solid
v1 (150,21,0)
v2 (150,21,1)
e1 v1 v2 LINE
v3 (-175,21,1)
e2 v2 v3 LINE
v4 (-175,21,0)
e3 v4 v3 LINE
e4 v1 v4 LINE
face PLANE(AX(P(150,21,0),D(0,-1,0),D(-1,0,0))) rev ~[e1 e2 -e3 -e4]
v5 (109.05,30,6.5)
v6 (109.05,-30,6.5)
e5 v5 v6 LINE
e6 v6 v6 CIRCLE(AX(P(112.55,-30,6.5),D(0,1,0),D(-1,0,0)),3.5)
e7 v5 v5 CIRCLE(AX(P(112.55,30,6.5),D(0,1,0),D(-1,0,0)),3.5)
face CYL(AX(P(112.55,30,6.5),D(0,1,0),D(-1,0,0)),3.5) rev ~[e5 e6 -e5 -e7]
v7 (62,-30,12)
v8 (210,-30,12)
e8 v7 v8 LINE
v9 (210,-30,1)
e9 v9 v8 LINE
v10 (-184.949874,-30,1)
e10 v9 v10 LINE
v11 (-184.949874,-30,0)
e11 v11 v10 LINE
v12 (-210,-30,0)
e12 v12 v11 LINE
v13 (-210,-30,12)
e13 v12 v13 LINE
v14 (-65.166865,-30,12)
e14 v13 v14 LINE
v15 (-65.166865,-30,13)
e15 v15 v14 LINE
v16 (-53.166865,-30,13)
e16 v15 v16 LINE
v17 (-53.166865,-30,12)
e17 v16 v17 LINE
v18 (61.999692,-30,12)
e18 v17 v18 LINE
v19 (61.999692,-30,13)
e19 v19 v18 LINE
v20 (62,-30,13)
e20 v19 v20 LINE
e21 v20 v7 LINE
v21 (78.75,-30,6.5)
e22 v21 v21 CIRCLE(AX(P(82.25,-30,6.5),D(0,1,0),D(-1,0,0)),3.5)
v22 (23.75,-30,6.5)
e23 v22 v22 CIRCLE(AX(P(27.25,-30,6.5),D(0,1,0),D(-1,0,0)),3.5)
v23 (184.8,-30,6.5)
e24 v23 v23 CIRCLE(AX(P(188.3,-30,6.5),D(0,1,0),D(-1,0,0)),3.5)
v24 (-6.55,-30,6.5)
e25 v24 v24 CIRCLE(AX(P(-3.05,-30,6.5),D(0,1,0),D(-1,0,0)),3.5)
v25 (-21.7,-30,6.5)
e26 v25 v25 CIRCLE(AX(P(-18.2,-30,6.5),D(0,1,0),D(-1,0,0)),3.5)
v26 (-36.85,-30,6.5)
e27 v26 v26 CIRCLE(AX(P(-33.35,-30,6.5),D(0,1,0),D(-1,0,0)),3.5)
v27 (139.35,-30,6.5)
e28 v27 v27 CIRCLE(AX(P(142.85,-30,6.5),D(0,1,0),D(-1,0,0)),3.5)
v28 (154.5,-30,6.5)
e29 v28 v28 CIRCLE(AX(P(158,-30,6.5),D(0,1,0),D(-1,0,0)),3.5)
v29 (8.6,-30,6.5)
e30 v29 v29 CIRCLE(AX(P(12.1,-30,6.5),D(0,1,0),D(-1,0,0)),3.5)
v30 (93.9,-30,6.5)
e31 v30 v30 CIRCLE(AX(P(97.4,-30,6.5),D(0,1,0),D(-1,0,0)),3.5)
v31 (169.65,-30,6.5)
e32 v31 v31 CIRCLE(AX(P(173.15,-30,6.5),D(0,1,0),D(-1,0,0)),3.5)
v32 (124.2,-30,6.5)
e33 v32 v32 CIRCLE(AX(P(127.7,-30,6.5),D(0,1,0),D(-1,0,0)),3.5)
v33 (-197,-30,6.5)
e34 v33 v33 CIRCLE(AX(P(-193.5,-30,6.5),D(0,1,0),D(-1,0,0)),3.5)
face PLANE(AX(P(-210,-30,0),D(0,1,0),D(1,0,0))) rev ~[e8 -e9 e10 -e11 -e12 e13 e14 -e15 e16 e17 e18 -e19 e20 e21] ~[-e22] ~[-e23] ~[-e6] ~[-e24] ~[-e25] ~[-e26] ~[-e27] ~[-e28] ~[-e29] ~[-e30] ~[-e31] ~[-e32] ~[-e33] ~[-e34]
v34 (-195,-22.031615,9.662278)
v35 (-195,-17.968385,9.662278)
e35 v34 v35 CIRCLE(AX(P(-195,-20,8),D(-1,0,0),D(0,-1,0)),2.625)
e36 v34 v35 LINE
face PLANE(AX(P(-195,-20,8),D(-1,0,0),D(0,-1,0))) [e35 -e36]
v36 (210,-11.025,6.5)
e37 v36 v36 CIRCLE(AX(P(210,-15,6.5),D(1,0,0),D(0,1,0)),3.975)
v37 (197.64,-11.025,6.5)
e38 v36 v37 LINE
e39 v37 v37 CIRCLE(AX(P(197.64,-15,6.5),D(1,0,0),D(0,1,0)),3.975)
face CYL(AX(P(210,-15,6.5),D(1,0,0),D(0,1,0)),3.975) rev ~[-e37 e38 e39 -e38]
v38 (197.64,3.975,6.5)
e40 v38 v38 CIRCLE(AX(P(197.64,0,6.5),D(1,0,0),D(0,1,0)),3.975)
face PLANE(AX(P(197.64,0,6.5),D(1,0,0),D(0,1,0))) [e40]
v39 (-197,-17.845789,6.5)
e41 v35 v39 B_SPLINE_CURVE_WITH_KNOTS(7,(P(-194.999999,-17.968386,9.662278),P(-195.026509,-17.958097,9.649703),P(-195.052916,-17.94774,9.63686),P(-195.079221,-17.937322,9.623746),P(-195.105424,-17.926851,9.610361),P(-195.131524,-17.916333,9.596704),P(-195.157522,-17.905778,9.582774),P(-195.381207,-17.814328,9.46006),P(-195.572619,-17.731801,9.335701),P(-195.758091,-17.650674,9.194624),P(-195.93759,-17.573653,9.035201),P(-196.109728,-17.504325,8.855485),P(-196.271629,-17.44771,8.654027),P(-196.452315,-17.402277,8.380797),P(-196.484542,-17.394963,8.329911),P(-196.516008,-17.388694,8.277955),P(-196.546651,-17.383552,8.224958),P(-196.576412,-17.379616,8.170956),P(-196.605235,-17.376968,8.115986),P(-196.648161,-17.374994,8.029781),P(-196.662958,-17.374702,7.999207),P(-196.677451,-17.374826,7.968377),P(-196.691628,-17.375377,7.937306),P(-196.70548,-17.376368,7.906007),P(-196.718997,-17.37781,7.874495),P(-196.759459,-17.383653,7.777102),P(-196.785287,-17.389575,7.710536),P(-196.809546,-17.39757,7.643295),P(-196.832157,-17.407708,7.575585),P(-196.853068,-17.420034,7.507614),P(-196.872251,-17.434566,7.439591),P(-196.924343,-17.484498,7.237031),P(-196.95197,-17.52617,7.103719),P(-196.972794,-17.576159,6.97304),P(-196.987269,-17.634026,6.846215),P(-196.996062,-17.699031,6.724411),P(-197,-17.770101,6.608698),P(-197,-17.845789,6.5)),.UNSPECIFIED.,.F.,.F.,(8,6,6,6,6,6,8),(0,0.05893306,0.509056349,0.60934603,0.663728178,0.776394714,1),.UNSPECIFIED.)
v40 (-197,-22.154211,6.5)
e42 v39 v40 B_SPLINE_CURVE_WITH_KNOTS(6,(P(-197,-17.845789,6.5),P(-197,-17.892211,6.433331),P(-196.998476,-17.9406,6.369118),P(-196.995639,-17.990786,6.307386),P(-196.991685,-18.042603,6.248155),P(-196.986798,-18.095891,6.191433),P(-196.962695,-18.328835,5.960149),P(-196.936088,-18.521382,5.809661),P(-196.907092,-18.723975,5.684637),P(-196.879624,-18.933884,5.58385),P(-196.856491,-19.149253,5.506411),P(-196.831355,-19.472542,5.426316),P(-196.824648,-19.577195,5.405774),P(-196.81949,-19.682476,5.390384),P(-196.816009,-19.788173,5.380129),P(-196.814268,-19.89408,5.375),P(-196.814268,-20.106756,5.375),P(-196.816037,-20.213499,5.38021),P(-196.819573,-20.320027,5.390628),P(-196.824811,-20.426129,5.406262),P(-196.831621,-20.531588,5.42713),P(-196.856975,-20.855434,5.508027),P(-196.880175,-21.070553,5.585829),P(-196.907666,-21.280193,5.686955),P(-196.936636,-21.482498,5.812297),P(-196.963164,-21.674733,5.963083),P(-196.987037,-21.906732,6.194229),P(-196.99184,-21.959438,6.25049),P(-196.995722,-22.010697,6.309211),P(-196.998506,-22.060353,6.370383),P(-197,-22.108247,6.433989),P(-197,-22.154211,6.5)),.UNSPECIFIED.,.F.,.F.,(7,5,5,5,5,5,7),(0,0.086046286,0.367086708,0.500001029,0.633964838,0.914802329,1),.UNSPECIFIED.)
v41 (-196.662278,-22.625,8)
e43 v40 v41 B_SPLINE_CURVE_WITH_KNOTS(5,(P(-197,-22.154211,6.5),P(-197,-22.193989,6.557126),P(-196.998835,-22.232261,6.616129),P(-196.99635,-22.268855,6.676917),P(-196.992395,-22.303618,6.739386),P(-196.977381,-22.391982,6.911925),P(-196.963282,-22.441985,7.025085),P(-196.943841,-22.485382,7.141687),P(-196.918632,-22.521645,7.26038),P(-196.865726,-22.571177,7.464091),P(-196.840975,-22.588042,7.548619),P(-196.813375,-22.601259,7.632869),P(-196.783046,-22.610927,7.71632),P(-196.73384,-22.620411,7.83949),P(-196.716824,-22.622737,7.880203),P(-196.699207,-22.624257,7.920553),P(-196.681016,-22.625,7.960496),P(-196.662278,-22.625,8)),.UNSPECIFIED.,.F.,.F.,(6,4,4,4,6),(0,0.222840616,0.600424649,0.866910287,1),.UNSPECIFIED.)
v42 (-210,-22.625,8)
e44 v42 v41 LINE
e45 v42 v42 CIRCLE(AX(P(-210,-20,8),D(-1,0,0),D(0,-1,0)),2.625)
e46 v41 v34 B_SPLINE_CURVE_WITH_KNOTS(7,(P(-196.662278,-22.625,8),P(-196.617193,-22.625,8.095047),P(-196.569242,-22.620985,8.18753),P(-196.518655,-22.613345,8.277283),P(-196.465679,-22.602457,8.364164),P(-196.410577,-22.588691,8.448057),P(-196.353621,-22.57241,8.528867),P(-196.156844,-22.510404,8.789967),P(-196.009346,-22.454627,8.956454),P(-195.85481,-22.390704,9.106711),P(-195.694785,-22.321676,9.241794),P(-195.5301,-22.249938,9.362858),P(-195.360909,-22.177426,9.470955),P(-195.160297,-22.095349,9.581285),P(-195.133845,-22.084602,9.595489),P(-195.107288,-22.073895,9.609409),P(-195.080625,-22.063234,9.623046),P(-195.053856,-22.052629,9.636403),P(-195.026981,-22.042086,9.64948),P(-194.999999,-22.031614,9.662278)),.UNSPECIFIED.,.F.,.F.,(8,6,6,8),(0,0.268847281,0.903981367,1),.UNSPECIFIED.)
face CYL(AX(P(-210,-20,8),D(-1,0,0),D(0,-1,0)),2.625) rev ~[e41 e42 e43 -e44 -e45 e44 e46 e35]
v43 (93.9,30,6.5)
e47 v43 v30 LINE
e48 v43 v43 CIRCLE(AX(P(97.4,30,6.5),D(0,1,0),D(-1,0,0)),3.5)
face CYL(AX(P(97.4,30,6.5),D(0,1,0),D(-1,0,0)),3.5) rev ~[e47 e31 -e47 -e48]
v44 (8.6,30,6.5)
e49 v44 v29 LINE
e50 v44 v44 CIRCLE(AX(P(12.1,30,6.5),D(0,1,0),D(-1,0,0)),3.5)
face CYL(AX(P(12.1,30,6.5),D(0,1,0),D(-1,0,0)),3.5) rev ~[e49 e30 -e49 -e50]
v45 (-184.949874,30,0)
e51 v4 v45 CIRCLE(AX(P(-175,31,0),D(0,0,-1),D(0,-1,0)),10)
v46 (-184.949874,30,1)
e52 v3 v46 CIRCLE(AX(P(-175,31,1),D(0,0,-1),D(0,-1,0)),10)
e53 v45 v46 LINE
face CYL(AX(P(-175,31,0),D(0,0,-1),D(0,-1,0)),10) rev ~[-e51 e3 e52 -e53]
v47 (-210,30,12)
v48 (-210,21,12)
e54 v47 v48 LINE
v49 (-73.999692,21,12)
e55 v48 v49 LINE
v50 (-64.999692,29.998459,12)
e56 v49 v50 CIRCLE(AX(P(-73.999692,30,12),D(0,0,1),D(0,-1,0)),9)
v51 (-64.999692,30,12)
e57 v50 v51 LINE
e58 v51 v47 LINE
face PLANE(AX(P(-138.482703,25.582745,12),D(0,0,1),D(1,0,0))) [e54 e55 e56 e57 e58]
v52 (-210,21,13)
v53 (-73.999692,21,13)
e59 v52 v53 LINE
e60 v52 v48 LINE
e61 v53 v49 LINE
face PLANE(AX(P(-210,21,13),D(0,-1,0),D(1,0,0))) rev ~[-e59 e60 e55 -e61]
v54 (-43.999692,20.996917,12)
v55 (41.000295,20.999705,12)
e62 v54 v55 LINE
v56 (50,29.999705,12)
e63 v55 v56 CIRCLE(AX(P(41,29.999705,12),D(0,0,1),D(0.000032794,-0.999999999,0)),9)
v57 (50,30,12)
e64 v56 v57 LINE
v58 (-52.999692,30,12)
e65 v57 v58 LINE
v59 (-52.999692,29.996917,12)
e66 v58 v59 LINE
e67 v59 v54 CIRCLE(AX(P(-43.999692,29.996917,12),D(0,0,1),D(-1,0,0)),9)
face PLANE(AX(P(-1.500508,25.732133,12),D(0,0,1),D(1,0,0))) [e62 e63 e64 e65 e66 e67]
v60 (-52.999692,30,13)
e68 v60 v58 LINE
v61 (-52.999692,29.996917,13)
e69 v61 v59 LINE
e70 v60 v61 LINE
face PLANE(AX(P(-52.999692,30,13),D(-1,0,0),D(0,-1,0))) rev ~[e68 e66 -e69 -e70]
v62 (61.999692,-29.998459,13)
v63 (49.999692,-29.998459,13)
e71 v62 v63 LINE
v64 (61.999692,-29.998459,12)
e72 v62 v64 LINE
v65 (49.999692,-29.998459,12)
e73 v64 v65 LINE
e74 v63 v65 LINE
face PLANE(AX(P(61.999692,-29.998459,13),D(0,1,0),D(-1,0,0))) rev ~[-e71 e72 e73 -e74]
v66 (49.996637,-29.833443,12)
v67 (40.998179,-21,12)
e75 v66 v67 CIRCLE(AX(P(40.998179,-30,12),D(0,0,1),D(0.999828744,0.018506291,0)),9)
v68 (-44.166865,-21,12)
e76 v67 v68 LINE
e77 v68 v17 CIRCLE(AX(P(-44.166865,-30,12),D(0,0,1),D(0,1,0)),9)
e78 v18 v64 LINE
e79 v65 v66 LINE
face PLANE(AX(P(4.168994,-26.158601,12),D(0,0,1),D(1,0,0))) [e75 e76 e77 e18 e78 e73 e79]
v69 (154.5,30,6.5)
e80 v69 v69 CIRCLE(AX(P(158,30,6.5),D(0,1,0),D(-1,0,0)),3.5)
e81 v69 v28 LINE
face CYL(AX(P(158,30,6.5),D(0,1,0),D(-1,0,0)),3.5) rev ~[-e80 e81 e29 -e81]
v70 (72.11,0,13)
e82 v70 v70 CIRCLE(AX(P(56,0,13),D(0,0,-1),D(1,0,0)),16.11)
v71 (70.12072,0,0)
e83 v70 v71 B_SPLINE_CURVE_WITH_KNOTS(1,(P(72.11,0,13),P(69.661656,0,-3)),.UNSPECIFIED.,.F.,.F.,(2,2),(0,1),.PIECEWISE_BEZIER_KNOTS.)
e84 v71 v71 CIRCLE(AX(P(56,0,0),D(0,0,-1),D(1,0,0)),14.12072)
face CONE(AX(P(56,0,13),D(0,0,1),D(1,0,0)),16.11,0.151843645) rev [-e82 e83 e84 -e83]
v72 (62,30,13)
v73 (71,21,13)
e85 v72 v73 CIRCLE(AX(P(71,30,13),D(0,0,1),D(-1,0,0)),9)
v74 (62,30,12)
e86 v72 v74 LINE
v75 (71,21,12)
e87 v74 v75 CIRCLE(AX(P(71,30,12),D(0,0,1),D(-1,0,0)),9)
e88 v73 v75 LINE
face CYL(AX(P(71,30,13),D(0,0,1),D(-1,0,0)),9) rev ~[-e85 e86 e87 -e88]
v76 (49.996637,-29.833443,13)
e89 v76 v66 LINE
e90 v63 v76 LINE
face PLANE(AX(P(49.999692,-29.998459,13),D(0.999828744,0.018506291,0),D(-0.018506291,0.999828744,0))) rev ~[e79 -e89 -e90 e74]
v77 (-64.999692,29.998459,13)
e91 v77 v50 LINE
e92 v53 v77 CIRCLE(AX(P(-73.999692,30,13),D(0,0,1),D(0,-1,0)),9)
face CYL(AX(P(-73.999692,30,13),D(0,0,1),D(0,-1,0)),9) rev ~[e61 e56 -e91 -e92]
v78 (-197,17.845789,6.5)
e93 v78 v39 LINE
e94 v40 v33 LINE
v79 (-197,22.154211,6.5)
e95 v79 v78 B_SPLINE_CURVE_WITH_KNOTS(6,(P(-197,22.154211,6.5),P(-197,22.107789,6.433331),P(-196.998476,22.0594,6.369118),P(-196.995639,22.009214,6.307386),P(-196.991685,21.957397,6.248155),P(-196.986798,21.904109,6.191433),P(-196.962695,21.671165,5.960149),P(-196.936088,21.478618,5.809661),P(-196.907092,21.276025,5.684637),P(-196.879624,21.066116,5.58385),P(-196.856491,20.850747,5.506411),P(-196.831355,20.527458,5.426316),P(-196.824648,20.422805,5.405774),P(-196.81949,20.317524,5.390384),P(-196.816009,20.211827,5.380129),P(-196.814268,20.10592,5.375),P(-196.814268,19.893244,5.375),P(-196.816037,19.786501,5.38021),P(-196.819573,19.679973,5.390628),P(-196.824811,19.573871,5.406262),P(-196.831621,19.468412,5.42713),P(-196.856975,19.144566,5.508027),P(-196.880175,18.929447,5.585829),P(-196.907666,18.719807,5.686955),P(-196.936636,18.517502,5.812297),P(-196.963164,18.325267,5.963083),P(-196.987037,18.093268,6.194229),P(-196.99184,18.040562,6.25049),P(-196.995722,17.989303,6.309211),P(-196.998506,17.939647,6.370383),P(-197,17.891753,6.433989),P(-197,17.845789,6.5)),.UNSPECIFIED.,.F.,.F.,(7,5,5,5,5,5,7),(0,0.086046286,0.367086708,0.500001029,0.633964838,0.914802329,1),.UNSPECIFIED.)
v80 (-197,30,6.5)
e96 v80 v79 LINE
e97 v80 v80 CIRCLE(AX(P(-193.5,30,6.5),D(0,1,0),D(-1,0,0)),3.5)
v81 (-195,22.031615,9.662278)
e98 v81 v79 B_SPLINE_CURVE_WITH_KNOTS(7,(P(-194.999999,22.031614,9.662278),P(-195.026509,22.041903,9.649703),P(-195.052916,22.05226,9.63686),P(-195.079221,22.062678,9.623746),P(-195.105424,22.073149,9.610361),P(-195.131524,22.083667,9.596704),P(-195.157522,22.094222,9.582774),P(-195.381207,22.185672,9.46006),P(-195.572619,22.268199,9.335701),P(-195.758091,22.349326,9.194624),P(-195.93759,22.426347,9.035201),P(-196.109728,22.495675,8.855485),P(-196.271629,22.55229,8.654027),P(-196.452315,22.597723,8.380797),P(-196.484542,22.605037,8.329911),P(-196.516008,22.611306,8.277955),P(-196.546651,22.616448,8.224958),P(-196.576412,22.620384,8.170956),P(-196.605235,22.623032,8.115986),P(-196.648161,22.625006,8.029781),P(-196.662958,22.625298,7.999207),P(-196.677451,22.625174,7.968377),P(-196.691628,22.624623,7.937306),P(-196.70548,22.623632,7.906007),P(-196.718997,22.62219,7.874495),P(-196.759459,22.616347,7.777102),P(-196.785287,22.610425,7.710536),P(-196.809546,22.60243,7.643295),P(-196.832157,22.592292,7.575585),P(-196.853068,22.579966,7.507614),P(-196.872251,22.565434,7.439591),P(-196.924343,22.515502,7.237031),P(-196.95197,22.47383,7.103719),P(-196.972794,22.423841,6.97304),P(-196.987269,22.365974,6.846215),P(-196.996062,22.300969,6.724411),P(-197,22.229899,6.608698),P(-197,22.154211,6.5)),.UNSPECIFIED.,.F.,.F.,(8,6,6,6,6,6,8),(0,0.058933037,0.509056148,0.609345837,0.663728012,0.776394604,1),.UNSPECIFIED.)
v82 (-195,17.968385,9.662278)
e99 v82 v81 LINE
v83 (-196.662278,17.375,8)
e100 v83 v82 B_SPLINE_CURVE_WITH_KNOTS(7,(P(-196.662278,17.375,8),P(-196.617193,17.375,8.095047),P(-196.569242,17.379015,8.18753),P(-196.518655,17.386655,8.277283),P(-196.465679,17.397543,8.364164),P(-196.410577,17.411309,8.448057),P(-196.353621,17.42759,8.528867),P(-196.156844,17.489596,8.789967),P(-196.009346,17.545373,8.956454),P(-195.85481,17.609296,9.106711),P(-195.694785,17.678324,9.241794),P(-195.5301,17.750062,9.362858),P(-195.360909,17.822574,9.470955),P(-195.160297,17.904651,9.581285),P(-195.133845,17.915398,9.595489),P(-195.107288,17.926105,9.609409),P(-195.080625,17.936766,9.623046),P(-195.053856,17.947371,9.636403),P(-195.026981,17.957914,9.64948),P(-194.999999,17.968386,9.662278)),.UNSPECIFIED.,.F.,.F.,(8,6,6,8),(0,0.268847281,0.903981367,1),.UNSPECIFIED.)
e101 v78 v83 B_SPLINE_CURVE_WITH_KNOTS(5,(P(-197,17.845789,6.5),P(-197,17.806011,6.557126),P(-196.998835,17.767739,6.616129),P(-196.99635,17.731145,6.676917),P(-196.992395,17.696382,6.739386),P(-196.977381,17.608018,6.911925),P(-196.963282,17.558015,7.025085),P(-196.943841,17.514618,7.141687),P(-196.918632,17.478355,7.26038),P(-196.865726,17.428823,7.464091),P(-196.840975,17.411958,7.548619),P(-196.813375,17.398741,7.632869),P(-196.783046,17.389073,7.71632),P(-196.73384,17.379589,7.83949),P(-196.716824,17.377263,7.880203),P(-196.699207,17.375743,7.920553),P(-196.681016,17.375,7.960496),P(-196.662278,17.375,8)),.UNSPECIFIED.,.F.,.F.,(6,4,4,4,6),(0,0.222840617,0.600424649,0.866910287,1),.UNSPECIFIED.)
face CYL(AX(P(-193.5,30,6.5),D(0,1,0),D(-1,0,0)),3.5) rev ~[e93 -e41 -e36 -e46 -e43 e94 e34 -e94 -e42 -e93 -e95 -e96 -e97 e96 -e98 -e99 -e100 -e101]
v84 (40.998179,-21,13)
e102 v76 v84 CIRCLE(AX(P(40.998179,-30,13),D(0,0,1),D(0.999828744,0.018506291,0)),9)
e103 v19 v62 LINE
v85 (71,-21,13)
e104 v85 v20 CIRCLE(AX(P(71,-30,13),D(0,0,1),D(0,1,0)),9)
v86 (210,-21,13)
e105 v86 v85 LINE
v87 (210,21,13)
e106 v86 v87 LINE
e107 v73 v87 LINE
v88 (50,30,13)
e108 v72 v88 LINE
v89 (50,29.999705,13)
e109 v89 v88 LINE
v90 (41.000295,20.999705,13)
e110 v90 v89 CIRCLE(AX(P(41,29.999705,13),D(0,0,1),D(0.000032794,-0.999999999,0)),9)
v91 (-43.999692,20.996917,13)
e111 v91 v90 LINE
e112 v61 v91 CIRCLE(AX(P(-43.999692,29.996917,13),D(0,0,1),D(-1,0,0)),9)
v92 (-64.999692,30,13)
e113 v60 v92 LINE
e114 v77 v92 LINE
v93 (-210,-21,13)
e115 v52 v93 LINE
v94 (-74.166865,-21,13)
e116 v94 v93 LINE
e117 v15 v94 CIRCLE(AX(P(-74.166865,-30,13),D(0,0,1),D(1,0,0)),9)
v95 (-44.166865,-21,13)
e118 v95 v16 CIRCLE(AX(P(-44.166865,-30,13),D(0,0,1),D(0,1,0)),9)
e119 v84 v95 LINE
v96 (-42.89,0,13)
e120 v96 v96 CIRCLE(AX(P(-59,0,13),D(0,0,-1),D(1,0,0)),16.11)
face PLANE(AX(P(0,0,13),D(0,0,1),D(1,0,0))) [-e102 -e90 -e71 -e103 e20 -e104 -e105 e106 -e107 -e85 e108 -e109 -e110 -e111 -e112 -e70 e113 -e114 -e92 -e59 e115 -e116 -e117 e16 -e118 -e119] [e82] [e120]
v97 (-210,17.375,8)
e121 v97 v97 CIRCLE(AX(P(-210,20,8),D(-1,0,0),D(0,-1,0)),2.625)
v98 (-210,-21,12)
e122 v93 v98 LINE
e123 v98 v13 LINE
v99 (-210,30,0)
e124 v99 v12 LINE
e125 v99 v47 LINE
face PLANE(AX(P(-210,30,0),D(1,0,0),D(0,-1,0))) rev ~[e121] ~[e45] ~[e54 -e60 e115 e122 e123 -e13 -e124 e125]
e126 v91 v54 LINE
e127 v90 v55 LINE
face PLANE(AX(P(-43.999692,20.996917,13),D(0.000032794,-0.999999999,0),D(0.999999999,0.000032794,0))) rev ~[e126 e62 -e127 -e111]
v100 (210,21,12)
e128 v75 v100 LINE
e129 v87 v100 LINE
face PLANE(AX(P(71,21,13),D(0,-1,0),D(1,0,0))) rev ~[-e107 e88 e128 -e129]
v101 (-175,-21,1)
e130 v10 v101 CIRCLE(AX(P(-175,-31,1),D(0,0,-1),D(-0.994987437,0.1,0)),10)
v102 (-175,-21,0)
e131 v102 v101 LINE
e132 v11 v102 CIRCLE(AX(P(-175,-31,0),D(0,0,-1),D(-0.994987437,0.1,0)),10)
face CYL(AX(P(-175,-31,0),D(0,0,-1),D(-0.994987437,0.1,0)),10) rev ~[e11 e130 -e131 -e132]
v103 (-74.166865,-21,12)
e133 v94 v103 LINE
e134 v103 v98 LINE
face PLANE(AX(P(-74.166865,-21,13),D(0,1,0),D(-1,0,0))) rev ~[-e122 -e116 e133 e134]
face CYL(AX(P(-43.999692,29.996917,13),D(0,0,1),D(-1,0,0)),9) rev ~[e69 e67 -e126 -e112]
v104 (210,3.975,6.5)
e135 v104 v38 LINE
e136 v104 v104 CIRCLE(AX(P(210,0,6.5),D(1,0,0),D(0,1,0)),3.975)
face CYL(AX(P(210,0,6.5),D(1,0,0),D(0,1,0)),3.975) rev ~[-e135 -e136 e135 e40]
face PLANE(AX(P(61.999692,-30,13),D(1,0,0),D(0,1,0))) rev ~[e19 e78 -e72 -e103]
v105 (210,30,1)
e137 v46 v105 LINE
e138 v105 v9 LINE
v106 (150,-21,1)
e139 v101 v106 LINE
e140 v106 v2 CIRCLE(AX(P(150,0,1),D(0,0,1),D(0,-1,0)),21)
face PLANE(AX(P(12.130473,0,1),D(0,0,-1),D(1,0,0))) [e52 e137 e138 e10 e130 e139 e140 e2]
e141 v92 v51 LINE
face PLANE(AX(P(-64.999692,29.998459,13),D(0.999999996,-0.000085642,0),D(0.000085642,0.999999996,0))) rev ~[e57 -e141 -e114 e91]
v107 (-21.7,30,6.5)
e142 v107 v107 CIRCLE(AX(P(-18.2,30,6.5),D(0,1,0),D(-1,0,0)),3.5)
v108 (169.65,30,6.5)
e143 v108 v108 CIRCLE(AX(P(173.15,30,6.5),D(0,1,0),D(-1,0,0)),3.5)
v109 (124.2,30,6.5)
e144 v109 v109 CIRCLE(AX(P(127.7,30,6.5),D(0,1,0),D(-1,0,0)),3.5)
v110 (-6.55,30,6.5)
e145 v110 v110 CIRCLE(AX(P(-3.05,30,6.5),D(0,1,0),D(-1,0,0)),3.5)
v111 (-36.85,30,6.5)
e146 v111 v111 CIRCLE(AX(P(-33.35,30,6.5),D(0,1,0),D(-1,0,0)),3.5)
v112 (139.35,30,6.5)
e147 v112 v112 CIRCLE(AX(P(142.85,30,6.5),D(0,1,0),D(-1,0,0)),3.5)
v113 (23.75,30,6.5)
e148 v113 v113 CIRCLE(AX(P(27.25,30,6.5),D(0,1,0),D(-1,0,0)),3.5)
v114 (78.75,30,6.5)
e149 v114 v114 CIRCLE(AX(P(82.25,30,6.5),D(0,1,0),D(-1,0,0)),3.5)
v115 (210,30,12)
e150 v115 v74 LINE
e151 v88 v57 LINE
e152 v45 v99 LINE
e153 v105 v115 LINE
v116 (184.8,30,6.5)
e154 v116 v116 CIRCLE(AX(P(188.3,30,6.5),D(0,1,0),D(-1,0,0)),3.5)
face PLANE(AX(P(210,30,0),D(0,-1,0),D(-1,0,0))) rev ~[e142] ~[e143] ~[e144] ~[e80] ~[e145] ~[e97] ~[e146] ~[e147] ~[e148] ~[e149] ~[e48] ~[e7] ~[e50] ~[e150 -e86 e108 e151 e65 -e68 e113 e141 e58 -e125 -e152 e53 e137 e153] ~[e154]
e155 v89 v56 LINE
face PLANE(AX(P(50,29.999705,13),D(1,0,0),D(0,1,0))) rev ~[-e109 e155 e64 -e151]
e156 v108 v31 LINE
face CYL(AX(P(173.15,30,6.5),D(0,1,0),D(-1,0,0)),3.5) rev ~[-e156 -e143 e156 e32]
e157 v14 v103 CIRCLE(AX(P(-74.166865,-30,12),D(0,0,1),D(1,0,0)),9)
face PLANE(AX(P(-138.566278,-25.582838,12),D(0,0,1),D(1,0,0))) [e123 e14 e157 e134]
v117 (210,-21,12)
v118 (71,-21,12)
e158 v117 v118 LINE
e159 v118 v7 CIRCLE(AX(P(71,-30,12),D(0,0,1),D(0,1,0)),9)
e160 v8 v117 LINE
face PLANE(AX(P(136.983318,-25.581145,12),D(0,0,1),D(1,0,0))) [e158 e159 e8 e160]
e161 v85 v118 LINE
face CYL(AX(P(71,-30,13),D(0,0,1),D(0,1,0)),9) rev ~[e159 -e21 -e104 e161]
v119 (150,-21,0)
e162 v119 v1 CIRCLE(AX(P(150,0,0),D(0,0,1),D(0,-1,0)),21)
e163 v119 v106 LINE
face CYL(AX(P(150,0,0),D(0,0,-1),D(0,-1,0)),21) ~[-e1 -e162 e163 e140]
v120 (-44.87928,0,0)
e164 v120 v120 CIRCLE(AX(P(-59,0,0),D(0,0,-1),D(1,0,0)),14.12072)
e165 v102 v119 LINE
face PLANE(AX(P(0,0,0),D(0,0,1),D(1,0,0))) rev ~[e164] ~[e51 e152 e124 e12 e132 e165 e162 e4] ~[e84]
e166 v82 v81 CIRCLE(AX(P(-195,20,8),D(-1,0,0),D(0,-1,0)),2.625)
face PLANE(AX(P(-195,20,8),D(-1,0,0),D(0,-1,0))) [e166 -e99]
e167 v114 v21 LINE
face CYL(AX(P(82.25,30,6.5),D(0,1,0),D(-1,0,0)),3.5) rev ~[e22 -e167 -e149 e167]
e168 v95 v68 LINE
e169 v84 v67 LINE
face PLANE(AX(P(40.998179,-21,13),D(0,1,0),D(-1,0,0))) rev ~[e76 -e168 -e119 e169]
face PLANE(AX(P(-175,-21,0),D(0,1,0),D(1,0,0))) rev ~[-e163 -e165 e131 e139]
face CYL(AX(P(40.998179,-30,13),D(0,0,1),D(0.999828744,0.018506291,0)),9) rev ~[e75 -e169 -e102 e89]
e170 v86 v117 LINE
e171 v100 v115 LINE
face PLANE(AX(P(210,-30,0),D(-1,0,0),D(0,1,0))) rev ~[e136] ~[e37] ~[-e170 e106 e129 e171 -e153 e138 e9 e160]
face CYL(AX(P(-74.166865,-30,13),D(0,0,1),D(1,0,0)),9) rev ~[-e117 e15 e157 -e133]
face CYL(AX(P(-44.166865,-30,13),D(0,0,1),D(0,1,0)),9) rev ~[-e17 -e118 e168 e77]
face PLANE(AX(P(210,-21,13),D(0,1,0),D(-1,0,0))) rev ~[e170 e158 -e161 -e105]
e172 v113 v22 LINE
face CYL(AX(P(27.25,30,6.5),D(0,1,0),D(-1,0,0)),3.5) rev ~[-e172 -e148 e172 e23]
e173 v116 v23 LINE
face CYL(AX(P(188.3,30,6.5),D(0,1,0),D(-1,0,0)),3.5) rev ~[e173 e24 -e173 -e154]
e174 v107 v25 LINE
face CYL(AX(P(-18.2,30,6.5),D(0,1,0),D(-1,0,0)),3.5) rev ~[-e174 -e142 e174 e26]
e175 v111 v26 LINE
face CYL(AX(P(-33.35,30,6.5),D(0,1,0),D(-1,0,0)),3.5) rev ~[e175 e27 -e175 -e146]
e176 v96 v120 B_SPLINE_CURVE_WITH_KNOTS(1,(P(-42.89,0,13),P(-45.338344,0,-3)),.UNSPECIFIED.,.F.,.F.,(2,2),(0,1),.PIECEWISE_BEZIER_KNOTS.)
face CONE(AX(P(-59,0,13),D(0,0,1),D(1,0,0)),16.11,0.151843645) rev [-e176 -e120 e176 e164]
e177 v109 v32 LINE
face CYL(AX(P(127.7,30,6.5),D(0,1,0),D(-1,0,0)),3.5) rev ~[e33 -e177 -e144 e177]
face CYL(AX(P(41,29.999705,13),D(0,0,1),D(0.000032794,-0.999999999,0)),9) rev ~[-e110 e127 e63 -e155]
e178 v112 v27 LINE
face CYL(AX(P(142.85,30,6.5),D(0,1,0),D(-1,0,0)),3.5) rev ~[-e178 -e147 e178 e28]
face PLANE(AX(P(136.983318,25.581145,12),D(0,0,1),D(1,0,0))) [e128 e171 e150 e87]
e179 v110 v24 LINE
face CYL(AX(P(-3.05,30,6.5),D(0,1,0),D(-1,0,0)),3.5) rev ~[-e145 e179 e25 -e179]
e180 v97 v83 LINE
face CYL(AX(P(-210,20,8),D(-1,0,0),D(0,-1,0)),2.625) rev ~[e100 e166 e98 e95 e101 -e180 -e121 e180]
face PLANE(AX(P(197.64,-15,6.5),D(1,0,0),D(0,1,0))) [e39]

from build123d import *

# Parameters (mm, degrees)
F1_DEPTH  = 13
F2_R      = 16.11
F3_DEPTH  = 16
F3_TAPER  = 8.7
F5_DEPTH  = 1
F6_R      = 3.5
F7_DEPTH  = 60
F9_DEPTH  = 1
F10_DEPTH = 1
F11_DEPTH = 1
F12_DEPTH = 1
F13_R     = 2.625
F14_DEPTH = 15
F15_R     = 3.975
F16_DEPTH = 12.36


# Not quite as in the source:
# - ends of sketch curves that miss each other by under 0.0002 mm in the source are joined


with BuildPart() as f1:
    # F0 (on Top) → F1 (new body)
    with BuildSketch(Plane.XY):
        Polygon((-210, -30), (210, -30), (210, 30), (-210, 30), (-210, 21), (-210, -21), align=None)
    extrude(amount=F1_DEPTH)

    # F2 (on face) → F3 (cut)
    with BuildSketch(Plane.XY.offset(13)):
        with Locations((56, 0)):
            Circle(F2_R)
        with Locations((-59, 0)):
            Circle(F2_R)
    extrude(amount=-F3_DEPTH, taper=F3_TAPER, mode=Mode.SUBTRACT)

    # F4 (on face) → F5 (cut)
    with BuildSketch(Plane(origin=(0, 0, 0), x_dir=(1, 0, 0), z_dir=(0, 0, -1))):
        with BuildLine():
            Line((210, 30), (-184.9498743711, 30))
            ThreePointArc((-184.9498743711, 30), (-181.7082039325, 23.5838015129), (-175, 21))
            Line((-175, 21), (150, 21))
            ThreePointArc((150, 21), (171, 0), (150, -21))
            Line((150, -21), (-175, -21))
            ThreePointArc((-175, -21), (-181.7082039325, -23.5838015129), (-184.9498743711, -30))
            Line((-184.9498743711, -30), (210, -30))
            Line((210, -30), (210, 30))
        make_face()
    extrude(amount=-F5_DEPTH, mode=Mode.SUBTRACT)

    # F6 (on face) → F7 (cut)
    with BuildSketch(Plane(origin=(0, 30, 0), x_dir=(-1, 0, 0), z_dir=(0, 1, 0))):
        with BuildLine():
            ThreePointArc((190, 6.5), (193.5, 3), (197, 6.5))
            Line((197, 6.5), (193.5, 6.5))
            Line((193.5, 6.5), (190, 6.5))
        make_face()
        with BuildLine():
            Line((193.5, 6.5), (197, 6.5))
            ThreePointArc((197, 6.5), (193.5, 10), (190, 6.5))
            Line((190, 6.5), (193.5, 6.5))
        make_face()
        with Locations((33.35, 6.5)):
            Circle(F6_R)
        with Locations((18.2, 6.5)):
            Circle(F6_R)
        with Locations((3.05, 6.5)):
            Circle(F6_R)
        with Locations((-12.1, 6.5)):
            Circle(F6_R)
        with BuildLine():
            ThreePointArc((-30.75, 6.5), (-27.25, 3), (-23.75, 6.5))
            ThreePointArc((-23.75, 6.5), (-27.25, 10), (-30.75, 6.5))
        make_face()
        with Locations((-82.25, 6.5)):
            Circle(F6_R)
        with Locations((-97.4, 6.5)):
            Circle(F6_R)
        with Locations((-112.55, 6.5)):
            Circle(F6_R)
        with Locations((-127.7, 6.5)):
            Circle(F6_R)
        with Locations((-142.85, 6.5)):
            Circle(F6_R)
        with Locations((-158, 6.5)):
            Circle(F6_R)
        with Locations((-173.15, 6.5)):
            Circle(F6_R)
        with Locations((-188.3, 6.5)):
            Circle(F6_R)
    extrude(amount=-F7_DEPTH, mode=Mode.SUBTRACT)

    # F8 (on face) → F9 (cut)
    with BuildSketch(Plane.XY.offset(13)):
        with BuildLine():
            Line((210, 30), (62, 30))
            ThreePointArc((62, 30), (64.6360389693, 23.6360389693), (71, 21))
            Line((71, 21), (210, 21))
            Line((210, 21), (210, 30))
        make_face()
    extrude(amount=-F9_DEPTH, mode=Mode.SUBTRACT)

    # F8 (on face) → F10 (cut)
    with BuildSketch(Plane.XY.offset(13)):
        with BuildLine():
            Line((210, -30), (210, -21))
            Line((210, -21), (71, -21))
            ThreePointArc((71, -21), (64.6360389693, -23.6360389693), (62, -30))
            Line((62, -30), (210, -30))
        make_face()
        with BuildLine():
            ThreePointArc((-44.1668648796, -21), (-50.5308259103, -23.6360389693), (-53.1668648796, -30))
            Line((-53.1668648796, -30), (50, -30))
            Line((50, -30), (61.9996917391, -30))
            Line((61.9996917391, -30), (61.9996917391, -29.9984586954))
            Line((61.9996917391, -29.9984586954), (49.9996917391, -29.9984586954))
            Line((49.9996917391, -29.9984586954), (49.9966373946, -29.8334433813))
            ThreePointArc((49.9966373946, -29.8334433813), (47.3029780787, -23.5774222633), (40.9981786992, -21))
            Line((40.9981786992, -21), (-44.1668648796, -21))
        make_face()
    extrude(amount=-F10_DEPTH, mode=Mode.SUBTRACT)

    # F8 (on face) → F11 (cut)
    with BuildSketch(Plane.XY.offset(13)):
        with BuildLine():
            Line((-74.1668648796, -21), (-210, -21))
            Line((-210, -21), (-210, -30))
            Line((-210, -30), (-65.1668648796, -30))
            ThreePointArc((-65.1668648796, -30), (-67.8029038489, -23.6360389693), (-74.1668648796, -21))
        make_face()
        with BuildLine():
            ThreePointArc((-73.9996917391, 21), (-67.6362756652, 23.6354940592), (-64.9996918711, 29.9984586954))
            Line((-64.9996918711, 29.9984586954), (-64.9996917391, 30))
            Line((-64.9996917391, 30), (-210, 30))
            Line((-210, 30), (-210, 21))
            Line((-210, 21), (-73.9996917391, 21))
        make_face()
    extrude(amount=-F11_DEPTH, mode=Mode.SUBTRACT)

    # F8 (on face) → F12 (cut)
    with BuildSketch(Plane.XY.offset(13)):
        with BuildLine():
            Line((50, 30), (-52.9996917391, 30))
            Line((-52.9996917391, 30), (-52.9996917391, 29.9969173908))
            ThreePointArc((-52.9996917391, 29.9969173908), (-50.3636527698, 23.6329563601), (-43.9996917391, 20.9969173908))
            Line((-43.9996917391, 20.9969173908), (41.0002951444, 20.9997048653))
            ThreePointArc((41.0002951444, 20.9997048653), (47.3640653791, 23.6358481799), (50, 29.9997048604))
            Line((50, 29.9997048604), (50, 30))
        make_face()
    extrude(amount=-F12_DEPTH, mode=Mode.SUBTRACT)

    # F13 (on face) → F14 (cut)
    with BuildSketch(Plane(origin=(-210, 0, 0), x_dir=(0, -1, 0), z_dir=(-1, 0, 0))):
        with Locations((-20, 8)):
            Circle(F13_R)
        with Locations((20, 8)):
            Circle(F13_R)
    extrude(amount=-F14_DEPTH, mode=Mode.SUBTRACT)

    # F15 (on face) → F16 (cut)
    with BuildSketch(Plane.YZ.offset(210)):
        with Locations((0, 6.5)):
            Circle(F15_R)
        with Locations((-15, 6.5)):
            Circle(F15_R)
    extrude(amount=-F16_DEPTH, mode=Mode.SUBTRACT)


solid = f1.part
